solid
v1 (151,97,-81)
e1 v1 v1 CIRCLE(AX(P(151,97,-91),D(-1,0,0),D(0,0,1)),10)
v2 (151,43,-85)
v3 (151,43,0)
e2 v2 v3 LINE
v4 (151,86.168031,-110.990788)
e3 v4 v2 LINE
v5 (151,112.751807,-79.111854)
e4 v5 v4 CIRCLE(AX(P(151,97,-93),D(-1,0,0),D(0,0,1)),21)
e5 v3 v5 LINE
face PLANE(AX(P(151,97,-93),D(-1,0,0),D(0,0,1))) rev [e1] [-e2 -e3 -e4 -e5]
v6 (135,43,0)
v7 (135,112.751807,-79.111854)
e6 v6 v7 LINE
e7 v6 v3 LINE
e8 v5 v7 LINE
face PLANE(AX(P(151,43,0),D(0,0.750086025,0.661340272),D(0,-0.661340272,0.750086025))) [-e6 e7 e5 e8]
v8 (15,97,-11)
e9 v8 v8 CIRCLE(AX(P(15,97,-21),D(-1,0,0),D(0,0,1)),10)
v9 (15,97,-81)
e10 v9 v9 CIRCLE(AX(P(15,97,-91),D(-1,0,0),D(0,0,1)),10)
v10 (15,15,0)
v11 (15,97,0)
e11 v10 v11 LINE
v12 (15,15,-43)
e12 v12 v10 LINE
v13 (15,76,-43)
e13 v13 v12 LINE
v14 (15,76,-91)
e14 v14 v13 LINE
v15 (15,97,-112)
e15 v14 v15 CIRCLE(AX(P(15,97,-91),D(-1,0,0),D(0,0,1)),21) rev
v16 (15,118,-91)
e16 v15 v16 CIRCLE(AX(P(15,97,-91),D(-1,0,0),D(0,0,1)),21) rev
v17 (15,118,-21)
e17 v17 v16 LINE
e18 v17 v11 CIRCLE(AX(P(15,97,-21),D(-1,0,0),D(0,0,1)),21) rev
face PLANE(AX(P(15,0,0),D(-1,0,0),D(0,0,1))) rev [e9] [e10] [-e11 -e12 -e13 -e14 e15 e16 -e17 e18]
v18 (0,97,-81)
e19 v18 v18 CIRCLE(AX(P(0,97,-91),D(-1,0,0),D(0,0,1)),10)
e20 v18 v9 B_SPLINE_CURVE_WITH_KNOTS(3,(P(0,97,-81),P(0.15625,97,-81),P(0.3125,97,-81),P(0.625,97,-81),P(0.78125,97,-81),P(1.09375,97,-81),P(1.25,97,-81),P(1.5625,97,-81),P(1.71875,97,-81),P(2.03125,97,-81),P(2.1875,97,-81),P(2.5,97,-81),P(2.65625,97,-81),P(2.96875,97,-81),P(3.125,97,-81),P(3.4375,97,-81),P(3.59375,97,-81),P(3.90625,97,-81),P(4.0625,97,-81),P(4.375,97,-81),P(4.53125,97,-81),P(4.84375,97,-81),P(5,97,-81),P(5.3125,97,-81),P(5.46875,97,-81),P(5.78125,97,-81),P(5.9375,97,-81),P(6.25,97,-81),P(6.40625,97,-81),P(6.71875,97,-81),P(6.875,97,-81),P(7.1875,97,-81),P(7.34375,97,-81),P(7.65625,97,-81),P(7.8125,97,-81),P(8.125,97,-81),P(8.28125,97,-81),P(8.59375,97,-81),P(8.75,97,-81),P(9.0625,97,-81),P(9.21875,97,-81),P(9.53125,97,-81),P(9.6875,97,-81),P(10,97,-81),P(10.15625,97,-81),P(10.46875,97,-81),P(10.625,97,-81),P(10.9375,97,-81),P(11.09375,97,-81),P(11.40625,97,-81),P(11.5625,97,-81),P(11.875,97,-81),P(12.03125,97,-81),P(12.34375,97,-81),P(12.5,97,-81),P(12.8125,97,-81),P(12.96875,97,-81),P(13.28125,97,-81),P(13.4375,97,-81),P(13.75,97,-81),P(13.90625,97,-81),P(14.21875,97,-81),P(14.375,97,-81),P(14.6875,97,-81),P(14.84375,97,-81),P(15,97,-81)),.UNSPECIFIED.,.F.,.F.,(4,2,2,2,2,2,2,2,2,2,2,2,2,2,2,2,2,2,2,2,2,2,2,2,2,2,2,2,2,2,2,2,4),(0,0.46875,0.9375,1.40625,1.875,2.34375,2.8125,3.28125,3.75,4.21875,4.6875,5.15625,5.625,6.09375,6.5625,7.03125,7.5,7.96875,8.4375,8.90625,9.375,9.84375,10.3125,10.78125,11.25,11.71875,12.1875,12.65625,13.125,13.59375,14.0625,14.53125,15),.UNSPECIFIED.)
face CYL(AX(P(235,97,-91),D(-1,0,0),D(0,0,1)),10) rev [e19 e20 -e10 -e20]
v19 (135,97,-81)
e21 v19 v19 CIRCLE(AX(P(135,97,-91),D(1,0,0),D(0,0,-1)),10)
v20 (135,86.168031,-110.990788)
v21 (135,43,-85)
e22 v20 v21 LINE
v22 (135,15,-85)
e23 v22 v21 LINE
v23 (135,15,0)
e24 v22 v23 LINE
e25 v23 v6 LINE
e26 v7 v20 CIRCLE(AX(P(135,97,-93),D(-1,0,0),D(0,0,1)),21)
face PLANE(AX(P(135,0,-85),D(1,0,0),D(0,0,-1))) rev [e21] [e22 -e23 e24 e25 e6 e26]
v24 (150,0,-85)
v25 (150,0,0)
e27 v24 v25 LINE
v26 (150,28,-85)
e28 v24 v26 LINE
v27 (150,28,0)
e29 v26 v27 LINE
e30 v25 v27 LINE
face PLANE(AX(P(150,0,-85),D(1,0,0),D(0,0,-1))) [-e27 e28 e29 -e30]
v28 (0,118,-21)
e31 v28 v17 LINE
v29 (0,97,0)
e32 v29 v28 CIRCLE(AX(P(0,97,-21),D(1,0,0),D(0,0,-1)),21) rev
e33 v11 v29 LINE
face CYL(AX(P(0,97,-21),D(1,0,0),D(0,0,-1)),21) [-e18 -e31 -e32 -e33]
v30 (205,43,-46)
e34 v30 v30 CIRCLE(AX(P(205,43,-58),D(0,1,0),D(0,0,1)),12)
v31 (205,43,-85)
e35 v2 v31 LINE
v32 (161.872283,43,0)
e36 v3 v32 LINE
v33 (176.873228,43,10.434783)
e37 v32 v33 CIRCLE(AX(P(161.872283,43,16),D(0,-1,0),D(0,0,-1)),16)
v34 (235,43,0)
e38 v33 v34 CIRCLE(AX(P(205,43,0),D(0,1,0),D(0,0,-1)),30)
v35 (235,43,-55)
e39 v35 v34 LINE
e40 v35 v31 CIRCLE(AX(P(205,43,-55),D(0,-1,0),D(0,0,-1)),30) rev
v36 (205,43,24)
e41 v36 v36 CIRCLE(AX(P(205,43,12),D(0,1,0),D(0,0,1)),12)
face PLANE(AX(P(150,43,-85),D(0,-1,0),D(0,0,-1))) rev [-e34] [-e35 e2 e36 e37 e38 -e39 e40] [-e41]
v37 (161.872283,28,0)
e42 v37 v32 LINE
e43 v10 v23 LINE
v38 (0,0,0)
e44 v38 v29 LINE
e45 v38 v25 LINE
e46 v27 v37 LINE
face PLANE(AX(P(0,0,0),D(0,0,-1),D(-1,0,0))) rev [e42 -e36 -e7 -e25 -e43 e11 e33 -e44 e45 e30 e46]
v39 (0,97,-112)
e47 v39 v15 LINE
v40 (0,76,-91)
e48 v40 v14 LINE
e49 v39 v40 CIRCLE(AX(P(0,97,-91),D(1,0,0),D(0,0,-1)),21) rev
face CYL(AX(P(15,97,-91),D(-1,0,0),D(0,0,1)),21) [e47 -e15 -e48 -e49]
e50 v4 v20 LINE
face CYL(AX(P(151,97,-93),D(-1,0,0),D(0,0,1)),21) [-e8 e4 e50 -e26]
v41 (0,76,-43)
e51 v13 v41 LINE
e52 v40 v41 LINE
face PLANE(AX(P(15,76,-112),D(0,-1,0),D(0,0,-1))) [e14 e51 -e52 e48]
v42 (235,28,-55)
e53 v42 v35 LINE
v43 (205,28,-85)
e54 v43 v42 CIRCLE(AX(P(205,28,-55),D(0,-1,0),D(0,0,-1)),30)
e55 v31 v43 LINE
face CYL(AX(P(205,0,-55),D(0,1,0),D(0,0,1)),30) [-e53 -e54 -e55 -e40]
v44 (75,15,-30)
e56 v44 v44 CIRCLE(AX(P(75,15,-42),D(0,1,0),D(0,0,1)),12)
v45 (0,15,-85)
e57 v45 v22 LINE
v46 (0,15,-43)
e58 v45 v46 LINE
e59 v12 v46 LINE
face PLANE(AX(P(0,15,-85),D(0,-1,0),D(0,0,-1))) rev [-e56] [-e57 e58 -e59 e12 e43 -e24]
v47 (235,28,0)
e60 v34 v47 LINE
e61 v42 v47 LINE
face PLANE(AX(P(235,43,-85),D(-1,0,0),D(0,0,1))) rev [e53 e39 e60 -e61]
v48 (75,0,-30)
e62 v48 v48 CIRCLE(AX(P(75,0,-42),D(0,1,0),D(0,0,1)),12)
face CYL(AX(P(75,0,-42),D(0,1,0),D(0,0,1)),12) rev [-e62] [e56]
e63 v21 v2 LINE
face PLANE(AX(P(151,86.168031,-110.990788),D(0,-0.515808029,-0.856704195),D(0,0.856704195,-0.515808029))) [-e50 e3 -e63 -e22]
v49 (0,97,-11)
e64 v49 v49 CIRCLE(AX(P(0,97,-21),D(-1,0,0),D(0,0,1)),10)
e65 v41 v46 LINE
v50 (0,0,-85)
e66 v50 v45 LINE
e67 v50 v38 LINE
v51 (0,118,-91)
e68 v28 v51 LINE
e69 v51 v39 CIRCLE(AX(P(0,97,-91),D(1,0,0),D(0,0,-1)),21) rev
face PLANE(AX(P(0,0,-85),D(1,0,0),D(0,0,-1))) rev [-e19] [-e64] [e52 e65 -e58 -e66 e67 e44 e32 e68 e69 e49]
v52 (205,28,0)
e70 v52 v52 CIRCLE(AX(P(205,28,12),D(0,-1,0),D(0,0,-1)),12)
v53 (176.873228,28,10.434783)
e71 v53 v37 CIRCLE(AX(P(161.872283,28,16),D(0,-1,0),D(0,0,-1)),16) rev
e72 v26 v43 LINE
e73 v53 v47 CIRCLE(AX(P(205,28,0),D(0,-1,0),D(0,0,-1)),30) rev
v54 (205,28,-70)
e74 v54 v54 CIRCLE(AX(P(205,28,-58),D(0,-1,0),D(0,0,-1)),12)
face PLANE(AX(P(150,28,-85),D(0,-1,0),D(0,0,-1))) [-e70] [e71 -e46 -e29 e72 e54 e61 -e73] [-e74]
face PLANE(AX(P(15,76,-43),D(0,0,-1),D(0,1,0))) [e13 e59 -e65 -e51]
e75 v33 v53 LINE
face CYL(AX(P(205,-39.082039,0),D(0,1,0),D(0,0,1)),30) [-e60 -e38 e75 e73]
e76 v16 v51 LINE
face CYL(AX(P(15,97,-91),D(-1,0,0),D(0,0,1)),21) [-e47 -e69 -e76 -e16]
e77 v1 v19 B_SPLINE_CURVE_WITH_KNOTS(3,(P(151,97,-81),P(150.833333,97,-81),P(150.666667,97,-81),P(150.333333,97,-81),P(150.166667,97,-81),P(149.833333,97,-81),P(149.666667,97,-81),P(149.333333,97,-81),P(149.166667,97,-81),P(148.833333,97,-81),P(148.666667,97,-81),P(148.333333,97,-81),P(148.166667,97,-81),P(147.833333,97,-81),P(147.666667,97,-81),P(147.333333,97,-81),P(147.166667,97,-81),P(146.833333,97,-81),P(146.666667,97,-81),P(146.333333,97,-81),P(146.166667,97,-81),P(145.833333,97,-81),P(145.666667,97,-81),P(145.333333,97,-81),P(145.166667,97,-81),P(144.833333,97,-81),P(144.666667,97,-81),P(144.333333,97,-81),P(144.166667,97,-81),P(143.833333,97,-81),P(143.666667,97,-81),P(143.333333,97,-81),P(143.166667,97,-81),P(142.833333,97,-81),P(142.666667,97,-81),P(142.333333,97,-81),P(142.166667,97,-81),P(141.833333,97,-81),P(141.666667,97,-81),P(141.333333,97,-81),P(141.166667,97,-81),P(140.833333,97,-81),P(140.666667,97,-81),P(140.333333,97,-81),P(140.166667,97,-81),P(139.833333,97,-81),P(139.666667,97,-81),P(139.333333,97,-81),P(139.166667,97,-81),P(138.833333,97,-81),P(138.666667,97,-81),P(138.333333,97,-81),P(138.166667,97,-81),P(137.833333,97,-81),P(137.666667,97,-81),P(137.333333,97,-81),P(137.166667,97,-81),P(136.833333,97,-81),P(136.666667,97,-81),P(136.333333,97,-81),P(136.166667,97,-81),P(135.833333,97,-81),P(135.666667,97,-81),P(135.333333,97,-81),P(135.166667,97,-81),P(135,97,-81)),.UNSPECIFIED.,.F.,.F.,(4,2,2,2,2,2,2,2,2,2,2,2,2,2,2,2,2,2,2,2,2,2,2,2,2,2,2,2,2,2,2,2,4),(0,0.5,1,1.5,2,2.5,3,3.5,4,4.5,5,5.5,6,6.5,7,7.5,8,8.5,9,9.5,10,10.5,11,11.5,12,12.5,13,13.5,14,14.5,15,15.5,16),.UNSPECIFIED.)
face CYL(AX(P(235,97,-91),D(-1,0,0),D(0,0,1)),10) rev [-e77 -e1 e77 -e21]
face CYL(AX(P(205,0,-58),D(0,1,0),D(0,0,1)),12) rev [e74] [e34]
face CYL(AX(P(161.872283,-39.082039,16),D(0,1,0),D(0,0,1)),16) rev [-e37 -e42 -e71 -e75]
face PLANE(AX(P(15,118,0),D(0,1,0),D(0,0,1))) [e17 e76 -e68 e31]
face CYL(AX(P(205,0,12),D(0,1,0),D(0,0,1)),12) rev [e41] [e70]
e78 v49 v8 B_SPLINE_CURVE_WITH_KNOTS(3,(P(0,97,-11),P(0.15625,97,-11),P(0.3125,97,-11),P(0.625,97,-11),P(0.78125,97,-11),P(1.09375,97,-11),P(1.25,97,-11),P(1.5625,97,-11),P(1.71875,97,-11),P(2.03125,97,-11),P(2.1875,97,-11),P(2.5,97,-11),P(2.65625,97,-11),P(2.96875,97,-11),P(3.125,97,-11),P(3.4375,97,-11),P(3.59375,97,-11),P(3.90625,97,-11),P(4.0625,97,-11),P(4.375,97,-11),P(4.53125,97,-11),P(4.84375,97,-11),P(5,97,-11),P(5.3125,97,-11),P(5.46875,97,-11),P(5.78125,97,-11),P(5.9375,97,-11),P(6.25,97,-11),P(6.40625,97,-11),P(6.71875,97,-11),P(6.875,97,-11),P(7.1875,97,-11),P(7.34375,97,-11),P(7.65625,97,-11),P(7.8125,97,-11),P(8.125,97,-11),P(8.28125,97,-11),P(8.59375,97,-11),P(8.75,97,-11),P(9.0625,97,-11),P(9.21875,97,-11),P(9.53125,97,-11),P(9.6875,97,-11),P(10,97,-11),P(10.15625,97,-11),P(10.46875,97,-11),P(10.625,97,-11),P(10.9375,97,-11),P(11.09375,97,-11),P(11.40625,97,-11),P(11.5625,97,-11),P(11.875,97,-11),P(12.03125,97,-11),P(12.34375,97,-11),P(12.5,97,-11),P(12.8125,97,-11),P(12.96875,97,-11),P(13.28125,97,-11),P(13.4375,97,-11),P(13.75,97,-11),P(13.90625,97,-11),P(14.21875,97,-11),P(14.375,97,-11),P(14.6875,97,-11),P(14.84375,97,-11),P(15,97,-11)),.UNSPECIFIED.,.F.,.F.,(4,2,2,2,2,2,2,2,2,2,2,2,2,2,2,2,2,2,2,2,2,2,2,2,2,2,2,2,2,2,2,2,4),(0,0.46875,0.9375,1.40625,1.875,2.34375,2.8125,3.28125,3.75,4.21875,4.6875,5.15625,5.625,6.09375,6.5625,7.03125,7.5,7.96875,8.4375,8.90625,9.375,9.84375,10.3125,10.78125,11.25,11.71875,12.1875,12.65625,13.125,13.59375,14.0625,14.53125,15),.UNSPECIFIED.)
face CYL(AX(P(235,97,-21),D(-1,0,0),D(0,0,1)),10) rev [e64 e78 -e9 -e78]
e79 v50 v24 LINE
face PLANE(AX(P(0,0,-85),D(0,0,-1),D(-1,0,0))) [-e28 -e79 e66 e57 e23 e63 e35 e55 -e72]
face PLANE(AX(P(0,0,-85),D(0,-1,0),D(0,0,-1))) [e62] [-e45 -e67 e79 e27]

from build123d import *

# Parameters (mm, degrees)
EXTRUDE_THIN1_DEPTH = 85
BOSS_EXTRUDE1_DEPTH = 15
BOSS_EXTRUDE2_DEPTH = 16
FILLET1_R           = 21
BOSS_EXTRUDE3_DEPTH = 15
FILLET2_R           = 16
SKETCH6_R           = 12
CUT_EXTRUDE2_DEPTH  = 272.746205125
FILLET3_R           = 30
SKETCH7_R           = 12
CUT_EXTRUDE3_DEPTH  = 281.766807155
SKETCH9_R           = 10
CUT_EXTRUDE4_DEPTH  = 287.609490422


with BuildPart() as part:
    # Sketch1 → Extrude-Thin1 (new body)
    with BuildSketch(Plane.XY):
        Polygon((0, 0), (150, 0), (150, 28), (235, 28), (235, 43), (135, 43), (135, 15), (0, 15), align=None)
    extrude(amount=-EXTRUDE_THIN1_DEPTH)

    # Sketch2 → Boss-Extrude1 (add)
    with BuildSketch(Plane.ZY):
        Polygon((0, 15), (0, 118), (-112, 118), (-112, 76), (-43, 76), (-43, 15), align=None)
    extrude(amount=-BOSS_EXTRUDE1_DEPTH)

    # Sketch3 → Boss-Extrude2 (add)
    with BuildSketch(Plane.ZY.offset(-135)):
        with BuildLine():
            Line((0, 43), (-79.111854281, 112.751806515))
            ThreePointArc((-79.111854281, 112.751806515), (-106.449245092, 113.128168106), (-110.990788091, 86.168031394))
            Line((-110.990788091, 86.168031394), (-85, 43))
            Line((-85, 43), (0, 43))
        make_face()
    extrude(amount=-BOSS_EXTRUDE2_DEPTH)

    # Fillet1
    fillet1_edges = [part.edges().sort_by_distance(p)[0] for p in [
        (7.5, 76, -112),
        (7.5, 118, -112),
        (7.5, 118, 0),
    ]]
    fillet(fillet1_edges, radius=FILLET1_R - 0.0001)  # a hair under: the kernel refuses the full size

    # Sketch5 → Boss-Extrude3 (add)
    with BuildSketch(Plane(origin=(0, 43, 0), x_dir=(1, 0, 0), z_dir=(0, 1, 0))):
        with BuildLine():
            Line((175, 0), (235, 0))
            ThreePointArc((235, 0), (205, -30), (175, 0))
        make_face()
    extrude(amount=-BOSS_EXTRUDE3_DEPTH)

    # Fillet2
    fillet2_edges = [part.edges().sort_by_distance(p)[0] for p in [
        (175, 35.5, 0),
    ]]
    fillet(fillet2_edges, radius=FILLET2_R)

    # Sketch6 → Cut-Extrude2 (cut, through all)
    with BuildSketch(Plane(origin=(0, 43, 0), x_dir=(1, 0, 0), z_dir=(0, 1, 0))):
        with Locations(Location((205, -12, 0), (0, 0, 270))):
            Circle(SKETCH6_R)
        with Locations(Location((205, 58, 0), (0, 0, 270))):
            Circle(SKETCH6_R)
    extrude(amount=-CUT_EXTRUDE2_DEPTH, mode=Mode.SUBTRACT)

    # Fillet3
    fillet3_edges = [part.edges().sort_by_distance(p)[0] for p in [
        (235, 35.5, -85),
    ]]
    fillet(fillet3_edges, radius=FILLET3_R)

    # Sketch7 → Cut-Extrude3 (cut, through all)
    with BuildSketch(Plane(origin=(0, 15, 0), x_dir=(1, 0, 0), z_dir=(0, 1, 0))):
        with Locations(Location((75, 42, 0), (0, 0, 270))):
            Circle(SKETCH7_R)
    extrude(amount=-CUT_EXTRUDE3_DEPTH, mode=Mode.SUBTRACT)

    # Sketch9 → Cut-Extrude4 (cut, through all)
    with BuildSketch(Plane.ZY):
        with Locations((-91, 97)):
            Circle(SKETCH9_R)
        with Locations((-21, 97)):
            Circle(SKETCH9_R)
    extrude(amount=-CUT_EXTRUDE4_DEPTH, mode=Mode.SUBTRACT)


solid = part.part
